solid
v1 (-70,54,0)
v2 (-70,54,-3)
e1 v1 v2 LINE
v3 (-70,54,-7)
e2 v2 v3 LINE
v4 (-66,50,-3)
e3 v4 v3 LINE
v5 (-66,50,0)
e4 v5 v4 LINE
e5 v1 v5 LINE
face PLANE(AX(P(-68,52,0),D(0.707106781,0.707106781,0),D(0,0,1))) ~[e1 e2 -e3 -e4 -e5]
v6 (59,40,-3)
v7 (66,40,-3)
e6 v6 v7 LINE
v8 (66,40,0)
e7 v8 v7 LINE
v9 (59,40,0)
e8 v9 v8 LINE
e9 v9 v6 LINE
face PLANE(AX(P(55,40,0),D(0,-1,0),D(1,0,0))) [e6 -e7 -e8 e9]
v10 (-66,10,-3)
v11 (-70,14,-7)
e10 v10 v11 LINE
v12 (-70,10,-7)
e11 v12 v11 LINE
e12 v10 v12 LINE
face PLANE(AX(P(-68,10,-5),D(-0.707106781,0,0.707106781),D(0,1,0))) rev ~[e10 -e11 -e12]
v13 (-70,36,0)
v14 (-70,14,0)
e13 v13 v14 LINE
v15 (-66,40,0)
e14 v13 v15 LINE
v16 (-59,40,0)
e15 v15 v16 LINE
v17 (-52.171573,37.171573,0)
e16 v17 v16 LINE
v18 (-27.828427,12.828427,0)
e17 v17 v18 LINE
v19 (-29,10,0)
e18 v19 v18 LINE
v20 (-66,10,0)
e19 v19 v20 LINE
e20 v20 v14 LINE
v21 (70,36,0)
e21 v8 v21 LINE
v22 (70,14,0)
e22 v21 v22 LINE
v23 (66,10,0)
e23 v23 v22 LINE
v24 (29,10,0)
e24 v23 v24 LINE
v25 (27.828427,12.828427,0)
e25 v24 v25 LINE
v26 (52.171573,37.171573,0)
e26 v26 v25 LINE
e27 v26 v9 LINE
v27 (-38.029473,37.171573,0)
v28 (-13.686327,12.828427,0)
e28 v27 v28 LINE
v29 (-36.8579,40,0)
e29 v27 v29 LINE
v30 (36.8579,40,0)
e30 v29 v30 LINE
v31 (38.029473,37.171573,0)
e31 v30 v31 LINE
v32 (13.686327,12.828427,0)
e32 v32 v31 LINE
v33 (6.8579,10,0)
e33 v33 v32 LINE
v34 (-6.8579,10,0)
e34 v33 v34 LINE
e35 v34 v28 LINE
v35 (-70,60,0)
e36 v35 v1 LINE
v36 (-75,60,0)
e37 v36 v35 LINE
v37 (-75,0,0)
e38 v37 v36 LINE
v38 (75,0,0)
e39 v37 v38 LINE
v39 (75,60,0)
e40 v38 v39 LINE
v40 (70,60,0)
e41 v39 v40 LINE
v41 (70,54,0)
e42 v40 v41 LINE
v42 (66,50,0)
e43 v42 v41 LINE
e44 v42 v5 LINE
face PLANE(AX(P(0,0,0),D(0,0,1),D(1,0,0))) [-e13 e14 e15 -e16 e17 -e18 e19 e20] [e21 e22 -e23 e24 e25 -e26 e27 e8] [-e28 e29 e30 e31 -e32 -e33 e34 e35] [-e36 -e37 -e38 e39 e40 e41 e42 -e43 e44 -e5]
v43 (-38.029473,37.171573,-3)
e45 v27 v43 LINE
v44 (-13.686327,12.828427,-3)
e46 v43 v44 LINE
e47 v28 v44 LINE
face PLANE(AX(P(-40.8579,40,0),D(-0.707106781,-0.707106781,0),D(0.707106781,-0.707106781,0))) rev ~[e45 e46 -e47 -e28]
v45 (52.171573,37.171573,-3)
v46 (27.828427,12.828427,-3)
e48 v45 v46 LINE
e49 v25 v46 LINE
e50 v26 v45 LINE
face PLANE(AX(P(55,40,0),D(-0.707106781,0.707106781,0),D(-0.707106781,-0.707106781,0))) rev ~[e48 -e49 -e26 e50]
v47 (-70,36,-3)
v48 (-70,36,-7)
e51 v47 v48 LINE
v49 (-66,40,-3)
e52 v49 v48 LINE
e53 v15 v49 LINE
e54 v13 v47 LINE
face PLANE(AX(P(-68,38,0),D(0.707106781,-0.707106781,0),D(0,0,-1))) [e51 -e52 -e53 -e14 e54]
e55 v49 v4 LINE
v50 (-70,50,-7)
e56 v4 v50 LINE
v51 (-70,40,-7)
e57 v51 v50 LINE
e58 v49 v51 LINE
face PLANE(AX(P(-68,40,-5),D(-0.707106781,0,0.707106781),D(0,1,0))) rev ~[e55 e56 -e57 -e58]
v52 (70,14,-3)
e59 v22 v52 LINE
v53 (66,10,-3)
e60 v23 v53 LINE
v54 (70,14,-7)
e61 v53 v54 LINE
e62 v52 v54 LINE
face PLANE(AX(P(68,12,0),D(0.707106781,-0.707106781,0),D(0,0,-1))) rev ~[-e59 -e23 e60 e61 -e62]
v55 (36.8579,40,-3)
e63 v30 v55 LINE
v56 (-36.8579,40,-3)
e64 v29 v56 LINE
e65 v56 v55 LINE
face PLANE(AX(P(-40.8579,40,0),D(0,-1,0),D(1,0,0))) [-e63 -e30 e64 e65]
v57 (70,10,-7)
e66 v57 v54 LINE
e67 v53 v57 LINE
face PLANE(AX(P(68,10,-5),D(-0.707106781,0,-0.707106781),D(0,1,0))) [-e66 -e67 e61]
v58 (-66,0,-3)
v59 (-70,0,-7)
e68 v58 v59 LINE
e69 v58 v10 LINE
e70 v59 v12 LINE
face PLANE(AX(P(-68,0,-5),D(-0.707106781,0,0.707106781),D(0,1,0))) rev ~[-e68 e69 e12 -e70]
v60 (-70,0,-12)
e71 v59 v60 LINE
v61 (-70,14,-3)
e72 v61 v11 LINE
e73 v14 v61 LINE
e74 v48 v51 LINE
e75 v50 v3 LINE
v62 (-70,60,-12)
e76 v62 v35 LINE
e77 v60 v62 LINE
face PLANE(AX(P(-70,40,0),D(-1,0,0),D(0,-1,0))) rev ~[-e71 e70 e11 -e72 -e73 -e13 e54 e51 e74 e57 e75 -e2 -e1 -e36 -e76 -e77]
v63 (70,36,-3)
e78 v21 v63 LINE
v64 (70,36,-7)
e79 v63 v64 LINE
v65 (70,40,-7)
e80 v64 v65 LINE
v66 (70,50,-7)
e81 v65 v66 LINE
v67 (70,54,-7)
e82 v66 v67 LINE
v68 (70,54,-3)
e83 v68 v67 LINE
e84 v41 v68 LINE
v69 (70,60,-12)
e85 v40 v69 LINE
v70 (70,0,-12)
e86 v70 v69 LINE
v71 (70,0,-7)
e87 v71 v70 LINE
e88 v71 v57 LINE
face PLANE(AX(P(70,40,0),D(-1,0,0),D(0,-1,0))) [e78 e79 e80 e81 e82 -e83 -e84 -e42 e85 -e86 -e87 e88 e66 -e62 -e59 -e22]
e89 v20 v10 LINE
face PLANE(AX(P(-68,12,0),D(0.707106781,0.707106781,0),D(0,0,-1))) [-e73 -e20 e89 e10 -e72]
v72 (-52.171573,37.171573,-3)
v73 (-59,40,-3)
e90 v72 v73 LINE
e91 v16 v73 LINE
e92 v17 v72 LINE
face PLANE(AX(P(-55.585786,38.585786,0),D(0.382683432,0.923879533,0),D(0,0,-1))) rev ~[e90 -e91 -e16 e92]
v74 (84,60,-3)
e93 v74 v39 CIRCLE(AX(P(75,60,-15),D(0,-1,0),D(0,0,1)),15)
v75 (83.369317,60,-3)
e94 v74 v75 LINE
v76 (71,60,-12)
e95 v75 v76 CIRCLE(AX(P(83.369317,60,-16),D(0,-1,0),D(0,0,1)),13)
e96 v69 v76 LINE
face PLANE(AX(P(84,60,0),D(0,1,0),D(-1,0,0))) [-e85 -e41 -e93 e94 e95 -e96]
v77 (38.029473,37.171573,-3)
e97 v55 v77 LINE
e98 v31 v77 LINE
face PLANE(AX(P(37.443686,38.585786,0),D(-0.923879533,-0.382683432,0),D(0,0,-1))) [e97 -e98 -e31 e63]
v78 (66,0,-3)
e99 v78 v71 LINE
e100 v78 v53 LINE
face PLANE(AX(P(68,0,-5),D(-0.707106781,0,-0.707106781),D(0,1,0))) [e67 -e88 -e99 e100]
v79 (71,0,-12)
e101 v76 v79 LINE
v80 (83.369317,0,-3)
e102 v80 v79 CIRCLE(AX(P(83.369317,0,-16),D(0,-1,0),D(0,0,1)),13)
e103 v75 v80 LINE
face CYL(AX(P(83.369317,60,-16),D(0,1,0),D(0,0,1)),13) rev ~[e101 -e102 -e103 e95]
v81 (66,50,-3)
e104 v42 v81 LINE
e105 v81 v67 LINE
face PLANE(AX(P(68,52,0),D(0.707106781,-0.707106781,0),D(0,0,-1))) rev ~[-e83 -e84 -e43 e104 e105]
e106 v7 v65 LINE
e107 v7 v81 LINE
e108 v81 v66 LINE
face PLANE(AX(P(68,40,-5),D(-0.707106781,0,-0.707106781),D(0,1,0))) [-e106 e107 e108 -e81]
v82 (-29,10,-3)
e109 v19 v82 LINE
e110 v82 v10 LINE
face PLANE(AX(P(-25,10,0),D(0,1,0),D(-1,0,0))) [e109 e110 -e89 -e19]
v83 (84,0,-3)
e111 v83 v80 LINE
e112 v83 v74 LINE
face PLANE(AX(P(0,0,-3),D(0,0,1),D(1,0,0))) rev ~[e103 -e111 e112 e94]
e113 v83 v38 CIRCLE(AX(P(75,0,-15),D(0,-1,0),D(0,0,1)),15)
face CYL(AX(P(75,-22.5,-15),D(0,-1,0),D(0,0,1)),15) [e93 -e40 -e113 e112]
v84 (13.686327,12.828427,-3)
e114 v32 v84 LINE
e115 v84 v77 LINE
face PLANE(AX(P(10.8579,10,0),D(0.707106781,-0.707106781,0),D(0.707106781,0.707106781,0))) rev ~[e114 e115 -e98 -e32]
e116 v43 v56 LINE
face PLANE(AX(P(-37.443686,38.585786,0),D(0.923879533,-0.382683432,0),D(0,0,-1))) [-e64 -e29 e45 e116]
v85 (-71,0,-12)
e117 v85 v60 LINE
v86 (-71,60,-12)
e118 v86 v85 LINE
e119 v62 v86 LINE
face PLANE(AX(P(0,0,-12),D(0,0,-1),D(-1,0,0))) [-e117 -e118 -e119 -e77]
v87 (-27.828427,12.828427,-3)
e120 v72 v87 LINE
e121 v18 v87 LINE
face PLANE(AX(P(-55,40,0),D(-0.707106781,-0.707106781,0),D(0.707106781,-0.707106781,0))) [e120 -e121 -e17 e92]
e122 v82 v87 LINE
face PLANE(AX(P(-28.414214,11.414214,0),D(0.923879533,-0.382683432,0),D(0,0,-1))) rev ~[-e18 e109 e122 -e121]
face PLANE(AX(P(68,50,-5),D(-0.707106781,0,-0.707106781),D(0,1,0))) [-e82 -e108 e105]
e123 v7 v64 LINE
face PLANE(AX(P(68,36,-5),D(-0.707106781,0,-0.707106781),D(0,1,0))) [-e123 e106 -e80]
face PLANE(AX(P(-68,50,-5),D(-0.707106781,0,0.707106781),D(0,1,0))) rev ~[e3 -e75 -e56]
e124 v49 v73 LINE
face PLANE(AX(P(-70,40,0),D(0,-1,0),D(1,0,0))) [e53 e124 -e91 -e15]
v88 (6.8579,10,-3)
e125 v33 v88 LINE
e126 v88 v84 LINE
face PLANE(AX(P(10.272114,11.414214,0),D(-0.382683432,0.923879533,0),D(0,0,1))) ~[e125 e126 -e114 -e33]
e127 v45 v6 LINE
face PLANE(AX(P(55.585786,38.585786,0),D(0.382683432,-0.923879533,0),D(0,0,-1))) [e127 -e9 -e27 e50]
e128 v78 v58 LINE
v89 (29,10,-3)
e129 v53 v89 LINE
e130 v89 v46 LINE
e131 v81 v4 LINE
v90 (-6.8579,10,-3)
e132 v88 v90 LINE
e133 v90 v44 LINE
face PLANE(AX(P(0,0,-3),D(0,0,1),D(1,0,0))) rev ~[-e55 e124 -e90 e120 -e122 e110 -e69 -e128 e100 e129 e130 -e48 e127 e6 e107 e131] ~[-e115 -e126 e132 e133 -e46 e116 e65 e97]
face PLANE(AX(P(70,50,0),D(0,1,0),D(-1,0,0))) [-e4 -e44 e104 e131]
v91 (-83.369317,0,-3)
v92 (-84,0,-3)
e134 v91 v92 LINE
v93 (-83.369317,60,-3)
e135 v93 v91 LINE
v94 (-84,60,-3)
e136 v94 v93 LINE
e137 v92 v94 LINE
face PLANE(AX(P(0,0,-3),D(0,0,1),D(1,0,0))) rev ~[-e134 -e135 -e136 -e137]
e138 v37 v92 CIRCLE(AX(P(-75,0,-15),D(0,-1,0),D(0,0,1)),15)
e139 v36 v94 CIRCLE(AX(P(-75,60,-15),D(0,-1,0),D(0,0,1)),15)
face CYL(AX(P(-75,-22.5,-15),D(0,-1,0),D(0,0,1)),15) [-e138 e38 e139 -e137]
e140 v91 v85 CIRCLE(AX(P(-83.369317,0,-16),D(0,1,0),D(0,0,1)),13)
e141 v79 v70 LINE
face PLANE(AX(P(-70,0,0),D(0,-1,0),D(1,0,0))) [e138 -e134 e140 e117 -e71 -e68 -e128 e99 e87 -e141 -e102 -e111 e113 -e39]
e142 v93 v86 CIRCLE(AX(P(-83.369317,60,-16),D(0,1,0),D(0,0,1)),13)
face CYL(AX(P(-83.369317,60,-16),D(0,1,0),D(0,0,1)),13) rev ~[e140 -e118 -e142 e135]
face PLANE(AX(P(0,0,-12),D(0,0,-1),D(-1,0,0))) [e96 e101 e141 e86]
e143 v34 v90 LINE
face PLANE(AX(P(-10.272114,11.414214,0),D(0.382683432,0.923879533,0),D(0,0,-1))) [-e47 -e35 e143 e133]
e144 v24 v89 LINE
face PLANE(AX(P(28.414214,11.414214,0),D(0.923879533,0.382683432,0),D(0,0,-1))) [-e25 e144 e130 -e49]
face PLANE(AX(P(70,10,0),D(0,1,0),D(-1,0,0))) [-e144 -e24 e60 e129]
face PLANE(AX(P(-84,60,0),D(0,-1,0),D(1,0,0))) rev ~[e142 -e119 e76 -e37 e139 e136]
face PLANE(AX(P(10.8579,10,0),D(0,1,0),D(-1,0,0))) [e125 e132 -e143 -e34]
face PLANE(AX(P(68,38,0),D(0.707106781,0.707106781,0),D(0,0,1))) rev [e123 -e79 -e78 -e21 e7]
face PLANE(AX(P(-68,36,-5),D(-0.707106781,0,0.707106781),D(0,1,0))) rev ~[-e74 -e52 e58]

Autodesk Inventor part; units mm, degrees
ref_plane "YZ Plane" through (0, 0, 0) normal (1, 0, 0) x (0, 1, 0)
ref_plane "XZ Plane" through (0, 0, 0) normal (0, 1, 0) x (-1, 0, 0)
ref_plane "XY Plane" through (0, 0, 0) normal (0, 0, 1) x (1, 0, 0)
sketch "Эскиз1" plane through (0, 0, 0) normal (0, 0, 1) x (1, 0, 0)
  line L0 (-70, 0) -> (70, 0)
  line L1 (70, 0) -> (70, 10)
  line L2 (70, 10) -> (-70, 10)
  line L3 (-70, 10) -> (-70, 0)
  line L4 (-70, 0) -> (-84, 0)
  line L5 (-84, 0) -> (-84, 60)
  line L6 (-84, 60) -> (-70, 60)
  line L7 (-70, 60) -> (-70, 0)
  line L8 (-70, 50) -> (-70, 60)
  line L9 (-70, 40) -> (70, 40)
  line L10 (70, 40) -> (70, 50)
  line L11 (70, 50) -> (-70, 50)
  line L12 (-70, 50) -> (-70, 40)
  line L13 (70, 0) -> (84, 0)
  line L14 (84, 0) -> (84, 60)
  line L15 (84, 60) -> (70, 60)
  line L16 (70, 60) -> (70, 0)
  line L17 (-55, 40) -> (-25, 10)
  line L18 (-40.8579, 40) -> (-10.8579, 10)
  line L19 (55, 40) -> (25, 10)
  line L20 (10.8579, 10) -> (40.8579, 40)
  point P0 (0, 0)
  dimension "d0" = 140
  dimension "d1" = 10
  dimension "d2" = 60
  dimension "d4" = 10
  dimension "d5" = 10
  dimension "d6" = 60
  dimension "d7" = 14
  dimension "d8" = 14
  dimension "d9" = 0
  dimension "d24" = 45
  dimension "d25" = 45
  dimension "d26" = 10
  dimension "d27" = 0
  dimension "d28" = 15
  dimension "d29" = 70
  dimension "d30" = 45
  dimension "d31" = 45
  dimension "d32" = 15
  dimension "d33" = 10
extrude "Выдавливание1" add sketch "Эскиз1" against normal blind 3 contours L3 L2 L1 L0 | L4 L5 L6 L7 L3 | L1 L16 L10 L15 L14 L13 | L17 L9 L18 L2 | L7 L11 L10 L9 | L2 L20 L9 L19
sketch "Эскиз2" plane through (0, 0, -3) normal (0, 0, -1) x (-1, 0, 0)
  line L0 (-70, 60) -> (-84, 60) projected
  line L1 (-70, 60) -> (-71, 60)
  line L2 (-71, 60) -> (-71, 0)
  line L3 (-71, 0) -> (-70, 0)
  line L4 (-70, 0) -> (-70, 60)
  line L5 (70, 60) -> (71, 60)
  line L6 (71, 60) -> (71, 0)
  line L7 (71, 0) -> (70, 0)
  line L8 (70, 0) -> (70, 60)
  line L9 (-84, 0) -> (84, 0) projected
  point P0 (0, 0)
  dimension "d12" = 1
  dimension "d13" = 1
  dimension "d34" = 0
extrude "Выдавливание2" add sketch "Эскиз2" along normal blind 9
fillet "Сопряжение1" radius 13 2 edges at (71, 30, -3) (-71, 30, -3)
chamfer "Фаска2" distance 4 angle 45 14 edges at (-70, 50, -1.5) (-70, 10, -1.5) (-70, 40, -1.5) (70, 10, -1.5) (70, 40, -1.5) (70, 50, -1.5) (25, 10, -1.5) (-10.8579, 10, -1.5) (40.8579, 40, -1.5) (-25, 10, -1.5) (10.8579, 10, -1.5) (-40.8579, 40, -1.5) (-55, 40, -1.5) (55, 40, -1.5)
chamfer "Фаска3" distance 4 angle 45 8 edges at (-70, 52, -3) (-70, 38, -3) (-70, 5, -3) (-70, 12, -3) (70, 52, -3) (70, 38, -3) (70, 5, -3) (70, 12, -3)
fillet "Сопряжение2" radius 15 2 edges at (-84, 30, 0) (84, 30, 0)
properties part number "zenter"
